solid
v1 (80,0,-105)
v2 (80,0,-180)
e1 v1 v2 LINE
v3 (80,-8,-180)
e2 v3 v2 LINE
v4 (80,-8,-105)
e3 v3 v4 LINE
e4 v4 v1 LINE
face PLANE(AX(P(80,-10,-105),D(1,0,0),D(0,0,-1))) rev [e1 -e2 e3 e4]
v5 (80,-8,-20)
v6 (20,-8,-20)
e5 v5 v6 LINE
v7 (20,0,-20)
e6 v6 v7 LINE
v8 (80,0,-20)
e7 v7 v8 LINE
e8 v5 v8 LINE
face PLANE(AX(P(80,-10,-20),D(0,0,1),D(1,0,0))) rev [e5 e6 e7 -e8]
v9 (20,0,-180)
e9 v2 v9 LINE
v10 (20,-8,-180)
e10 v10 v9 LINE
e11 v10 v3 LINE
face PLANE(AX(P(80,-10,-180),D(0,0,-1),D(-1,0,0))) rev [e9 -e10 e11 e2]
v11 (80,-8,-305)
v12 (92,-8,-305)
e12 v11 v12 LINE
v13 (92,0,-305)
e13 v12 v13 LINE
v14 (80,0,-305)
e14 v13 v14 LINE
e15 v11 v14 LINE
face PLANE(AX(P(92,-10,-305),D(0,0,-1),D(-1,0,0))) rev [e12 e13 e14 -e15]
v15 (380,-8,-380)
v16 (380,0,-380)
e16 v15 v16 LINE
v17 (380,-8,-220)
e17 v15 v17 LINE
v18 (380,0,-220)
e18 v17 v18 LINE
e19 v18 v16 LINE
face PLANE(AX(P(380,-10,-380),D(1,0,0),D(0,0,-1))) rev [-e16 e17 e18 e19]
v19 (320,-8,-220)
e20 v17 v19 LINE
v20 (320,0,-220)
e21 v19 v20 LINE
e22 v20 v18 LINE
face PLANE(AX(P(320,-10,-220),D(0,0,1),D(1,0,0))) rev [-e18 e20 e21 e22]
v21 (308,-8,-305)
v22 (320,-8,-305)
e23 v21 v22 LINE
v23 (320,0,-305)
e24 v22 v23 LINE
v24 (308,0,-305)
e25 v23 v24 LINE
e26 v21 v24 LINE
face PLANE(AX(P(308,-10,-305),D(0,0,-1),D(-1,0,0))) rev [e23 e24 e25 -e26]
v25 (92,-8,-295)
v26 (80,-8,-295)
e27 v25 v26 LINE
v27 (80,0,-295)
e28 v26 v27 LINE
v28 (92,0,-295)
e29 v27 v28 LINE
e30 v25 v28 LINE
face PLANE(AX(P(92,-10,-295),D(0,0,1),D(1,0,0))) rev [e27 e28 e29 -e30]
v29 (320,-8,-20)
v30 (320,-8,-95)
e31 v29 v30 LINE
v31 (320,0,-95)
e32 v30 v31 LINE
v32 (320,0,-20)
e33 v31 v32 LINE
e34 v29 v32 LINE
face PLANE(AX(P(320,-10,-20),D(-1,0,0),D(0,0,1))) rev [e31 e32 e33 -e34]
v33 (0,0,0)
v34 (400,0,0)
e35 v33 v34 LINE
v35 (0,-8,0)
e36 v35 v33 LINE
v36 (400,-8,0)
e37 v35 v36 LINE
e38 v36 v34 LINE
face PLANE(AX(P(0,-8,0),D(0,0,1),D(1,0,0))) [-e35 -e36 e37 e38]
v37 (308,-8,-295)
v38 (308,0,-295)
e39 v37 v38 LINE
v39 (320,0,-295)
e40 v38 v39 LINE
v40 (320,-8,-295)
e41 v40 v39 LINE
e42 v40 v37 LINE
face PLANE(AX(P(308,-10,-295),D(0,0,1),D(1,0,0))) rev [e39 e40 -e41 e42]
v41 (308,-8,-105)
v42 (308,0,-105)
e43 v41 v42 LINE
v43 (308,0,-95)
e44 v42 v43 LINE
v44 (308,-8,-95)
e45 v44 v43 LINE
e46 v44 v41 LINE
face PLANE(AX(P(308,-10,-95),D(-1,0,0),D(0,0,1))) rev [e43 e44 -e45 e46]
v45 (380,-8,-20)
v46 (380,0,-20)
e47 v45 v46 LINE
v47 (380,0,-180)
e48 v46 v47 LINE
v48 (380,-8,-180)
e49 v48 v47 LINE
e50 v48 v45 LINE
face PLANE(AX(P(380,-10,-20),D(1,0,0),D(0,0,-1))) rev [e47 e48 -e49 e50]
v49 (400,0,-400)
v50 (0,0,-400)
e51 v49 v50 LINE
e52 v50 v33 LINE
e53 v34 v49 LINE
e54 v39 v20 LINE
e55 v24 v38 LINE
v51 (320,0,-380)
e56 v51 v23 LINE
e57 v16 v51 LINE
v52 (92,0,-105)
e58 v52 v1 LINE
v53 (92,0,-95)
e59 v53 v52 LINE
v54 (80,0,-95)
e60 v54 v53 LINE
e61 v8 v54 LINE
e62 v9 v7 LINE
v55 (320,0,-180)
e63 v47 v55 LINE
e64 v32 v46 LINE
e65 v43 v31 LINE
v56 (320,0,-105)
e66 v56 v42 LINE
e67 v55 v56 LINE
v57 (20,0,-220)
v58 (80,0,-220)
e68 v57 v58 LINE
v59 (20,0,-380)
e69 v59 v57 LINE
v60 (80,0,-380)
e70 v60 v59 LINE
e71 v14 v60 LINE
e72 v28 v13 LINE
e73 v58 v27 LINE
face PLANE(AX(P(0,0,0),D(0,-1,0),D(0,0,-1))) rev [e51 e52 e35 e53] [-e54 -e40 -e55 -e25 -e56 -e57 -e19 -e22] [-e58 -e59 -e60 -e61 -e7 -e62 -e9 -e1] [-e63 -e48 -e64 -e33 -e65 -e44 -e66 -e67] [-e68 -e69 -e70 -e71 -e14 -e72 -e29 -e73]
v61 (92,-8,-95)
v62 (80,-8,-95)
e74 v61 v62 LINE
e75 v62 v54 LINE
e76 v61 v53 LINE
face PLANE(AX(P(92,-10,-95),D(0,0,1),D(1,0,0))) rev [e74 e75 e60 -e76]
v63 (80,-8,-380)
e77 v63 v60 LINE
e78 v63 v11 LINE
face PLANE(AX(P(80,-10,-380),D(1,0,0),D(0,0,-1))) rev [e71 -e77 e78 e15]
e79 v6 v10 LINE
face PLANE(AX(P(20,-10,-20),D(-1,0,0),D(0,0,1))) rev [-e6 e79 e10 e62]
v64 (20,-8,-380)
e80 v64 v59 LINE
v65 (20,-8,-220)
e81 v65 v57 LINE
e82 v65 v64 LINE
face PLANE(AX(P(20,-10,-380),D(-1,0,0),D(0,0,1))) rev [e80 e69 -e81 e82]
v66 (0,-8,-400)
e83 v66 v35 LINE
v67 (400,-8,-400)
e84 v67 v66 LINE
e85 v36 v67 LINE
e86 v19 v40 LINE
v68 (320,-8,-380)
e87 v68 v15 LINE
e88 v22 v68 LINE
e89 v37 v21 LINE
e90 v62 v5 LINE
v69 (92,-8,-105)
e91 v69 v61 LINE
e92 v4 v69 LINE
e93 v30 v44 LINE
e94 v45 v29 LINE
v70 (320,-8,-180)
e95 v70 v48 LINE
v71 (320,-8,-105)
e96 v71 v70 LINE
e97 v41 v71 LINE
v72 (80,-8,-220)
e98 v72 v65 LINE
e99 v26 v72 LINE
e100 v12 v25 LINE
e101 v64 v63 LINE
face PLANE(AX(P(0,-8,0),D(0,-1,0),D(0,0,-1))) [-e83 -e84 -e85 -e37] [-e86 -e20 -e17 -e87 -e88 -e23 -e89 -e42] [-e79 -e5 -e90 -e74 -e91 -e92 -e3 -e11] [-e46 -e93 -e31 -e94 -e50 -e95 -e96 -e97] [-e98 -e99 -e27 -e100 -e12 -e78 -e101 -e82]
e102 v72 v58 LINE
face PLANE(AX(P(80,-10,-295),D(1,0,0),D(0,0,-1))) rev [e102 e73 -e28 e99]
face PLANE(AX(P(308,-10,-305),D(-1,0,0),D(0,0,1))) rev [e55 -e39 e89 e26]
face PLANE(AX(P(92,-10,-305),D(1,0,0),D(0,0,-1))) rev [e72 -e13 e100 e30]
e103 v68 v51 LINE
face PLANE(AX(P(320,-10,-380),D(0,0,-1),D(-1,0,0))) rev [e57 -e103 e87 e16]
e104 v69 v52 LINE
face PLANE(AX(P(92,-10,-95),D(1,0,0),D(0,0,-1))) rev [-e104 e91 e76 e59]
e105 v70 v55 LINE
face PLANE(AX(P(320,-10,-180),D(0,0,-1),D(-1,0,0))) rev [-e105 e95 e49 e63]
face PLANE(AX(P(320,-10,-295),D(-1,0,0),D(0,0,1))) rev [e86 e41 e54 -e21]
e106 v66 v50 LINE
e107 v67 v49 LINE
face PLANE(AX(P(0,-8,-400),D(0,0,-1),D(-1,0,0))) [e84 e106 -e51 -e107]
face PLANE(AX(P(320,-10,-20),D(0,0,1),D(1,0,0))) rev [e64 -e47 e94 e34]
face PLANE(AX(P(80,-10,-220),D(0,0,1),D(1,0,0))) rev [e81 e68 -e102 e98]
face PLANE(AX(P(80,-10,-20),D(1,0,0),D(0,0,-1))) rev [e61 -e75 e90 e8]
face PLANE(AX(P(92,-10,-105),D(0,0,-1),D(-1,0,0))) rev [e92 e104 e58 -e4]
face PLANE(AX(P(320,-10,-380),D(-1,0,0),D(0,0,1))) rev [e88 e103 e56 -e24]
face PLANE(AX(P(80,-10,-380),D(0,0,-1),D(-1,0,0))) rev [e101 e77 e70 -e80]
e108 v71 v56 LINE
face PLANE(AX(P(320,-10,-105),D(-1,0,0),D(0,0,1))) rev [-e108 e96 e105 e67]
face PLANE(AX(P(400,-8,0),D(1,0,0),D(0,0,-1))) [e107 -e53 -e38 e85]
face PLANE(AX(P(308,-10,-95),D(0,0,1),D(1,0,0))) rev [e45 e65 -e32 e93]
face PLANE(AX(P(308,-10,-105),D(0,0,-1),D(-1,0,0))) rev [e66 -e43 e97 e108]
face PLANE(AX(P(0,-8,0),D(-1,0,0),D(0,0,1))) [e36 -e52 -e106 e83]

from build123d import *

# Parameters (mm, degrees)
SKETCH1_W          = 400
SKETCH1_H          = 400
BASE_FLANGE1_DEPTH = 8
CUT_EXTRUDE1_DEPTH = 10


# Sheet-metal steps are written as plain solids
with BuildPart() as part:
    # Sketch1 → Base-Flange1 (new body)
    with BuildSketch(Plane(origin=(0, 0, 0), x_dir=(1, 0, 0), z_dir=(0, 1, 0))):
        with Locations((200, 200)):
            Rectangle(SKETCH1_W, SKETCH1_H)
    extrude(amount=-BASE_FLANGE1_DEPTH)

    # Sketch2 → Cut-Extrude1 (cut)
    with BuildSketch(Plane(origin=(0, 0, 0), x_dir=(1, 0, 0), z_dir=(0, 1, 0))):
        Polygon((80, 295), (80, 220), (20, 220), (20, 380), (80, 380), (80, 305), (92, 305), (92, 295), align=None)
        Polygon((92, 105), (80, 105), (80, 180), (20, 180), (20, 20), (80, 20), (80, 95), (92, 95), align=None)
        Polygon((320, 105), (320, 180), (380, 180), (380, 20), (320, 20), (320, 95), (308, 95), (308, 105), align=None)
        Polygon((308, 295), (320, 295), (320, 220), (380, 220), (380, 380), (320, 380), (320, 305), (308, 305), align=None)
    extrude(amount=-CUT_EXTRUDE1_DEPTH, mode=Mode.SUBTRACT)


solid = part.part
